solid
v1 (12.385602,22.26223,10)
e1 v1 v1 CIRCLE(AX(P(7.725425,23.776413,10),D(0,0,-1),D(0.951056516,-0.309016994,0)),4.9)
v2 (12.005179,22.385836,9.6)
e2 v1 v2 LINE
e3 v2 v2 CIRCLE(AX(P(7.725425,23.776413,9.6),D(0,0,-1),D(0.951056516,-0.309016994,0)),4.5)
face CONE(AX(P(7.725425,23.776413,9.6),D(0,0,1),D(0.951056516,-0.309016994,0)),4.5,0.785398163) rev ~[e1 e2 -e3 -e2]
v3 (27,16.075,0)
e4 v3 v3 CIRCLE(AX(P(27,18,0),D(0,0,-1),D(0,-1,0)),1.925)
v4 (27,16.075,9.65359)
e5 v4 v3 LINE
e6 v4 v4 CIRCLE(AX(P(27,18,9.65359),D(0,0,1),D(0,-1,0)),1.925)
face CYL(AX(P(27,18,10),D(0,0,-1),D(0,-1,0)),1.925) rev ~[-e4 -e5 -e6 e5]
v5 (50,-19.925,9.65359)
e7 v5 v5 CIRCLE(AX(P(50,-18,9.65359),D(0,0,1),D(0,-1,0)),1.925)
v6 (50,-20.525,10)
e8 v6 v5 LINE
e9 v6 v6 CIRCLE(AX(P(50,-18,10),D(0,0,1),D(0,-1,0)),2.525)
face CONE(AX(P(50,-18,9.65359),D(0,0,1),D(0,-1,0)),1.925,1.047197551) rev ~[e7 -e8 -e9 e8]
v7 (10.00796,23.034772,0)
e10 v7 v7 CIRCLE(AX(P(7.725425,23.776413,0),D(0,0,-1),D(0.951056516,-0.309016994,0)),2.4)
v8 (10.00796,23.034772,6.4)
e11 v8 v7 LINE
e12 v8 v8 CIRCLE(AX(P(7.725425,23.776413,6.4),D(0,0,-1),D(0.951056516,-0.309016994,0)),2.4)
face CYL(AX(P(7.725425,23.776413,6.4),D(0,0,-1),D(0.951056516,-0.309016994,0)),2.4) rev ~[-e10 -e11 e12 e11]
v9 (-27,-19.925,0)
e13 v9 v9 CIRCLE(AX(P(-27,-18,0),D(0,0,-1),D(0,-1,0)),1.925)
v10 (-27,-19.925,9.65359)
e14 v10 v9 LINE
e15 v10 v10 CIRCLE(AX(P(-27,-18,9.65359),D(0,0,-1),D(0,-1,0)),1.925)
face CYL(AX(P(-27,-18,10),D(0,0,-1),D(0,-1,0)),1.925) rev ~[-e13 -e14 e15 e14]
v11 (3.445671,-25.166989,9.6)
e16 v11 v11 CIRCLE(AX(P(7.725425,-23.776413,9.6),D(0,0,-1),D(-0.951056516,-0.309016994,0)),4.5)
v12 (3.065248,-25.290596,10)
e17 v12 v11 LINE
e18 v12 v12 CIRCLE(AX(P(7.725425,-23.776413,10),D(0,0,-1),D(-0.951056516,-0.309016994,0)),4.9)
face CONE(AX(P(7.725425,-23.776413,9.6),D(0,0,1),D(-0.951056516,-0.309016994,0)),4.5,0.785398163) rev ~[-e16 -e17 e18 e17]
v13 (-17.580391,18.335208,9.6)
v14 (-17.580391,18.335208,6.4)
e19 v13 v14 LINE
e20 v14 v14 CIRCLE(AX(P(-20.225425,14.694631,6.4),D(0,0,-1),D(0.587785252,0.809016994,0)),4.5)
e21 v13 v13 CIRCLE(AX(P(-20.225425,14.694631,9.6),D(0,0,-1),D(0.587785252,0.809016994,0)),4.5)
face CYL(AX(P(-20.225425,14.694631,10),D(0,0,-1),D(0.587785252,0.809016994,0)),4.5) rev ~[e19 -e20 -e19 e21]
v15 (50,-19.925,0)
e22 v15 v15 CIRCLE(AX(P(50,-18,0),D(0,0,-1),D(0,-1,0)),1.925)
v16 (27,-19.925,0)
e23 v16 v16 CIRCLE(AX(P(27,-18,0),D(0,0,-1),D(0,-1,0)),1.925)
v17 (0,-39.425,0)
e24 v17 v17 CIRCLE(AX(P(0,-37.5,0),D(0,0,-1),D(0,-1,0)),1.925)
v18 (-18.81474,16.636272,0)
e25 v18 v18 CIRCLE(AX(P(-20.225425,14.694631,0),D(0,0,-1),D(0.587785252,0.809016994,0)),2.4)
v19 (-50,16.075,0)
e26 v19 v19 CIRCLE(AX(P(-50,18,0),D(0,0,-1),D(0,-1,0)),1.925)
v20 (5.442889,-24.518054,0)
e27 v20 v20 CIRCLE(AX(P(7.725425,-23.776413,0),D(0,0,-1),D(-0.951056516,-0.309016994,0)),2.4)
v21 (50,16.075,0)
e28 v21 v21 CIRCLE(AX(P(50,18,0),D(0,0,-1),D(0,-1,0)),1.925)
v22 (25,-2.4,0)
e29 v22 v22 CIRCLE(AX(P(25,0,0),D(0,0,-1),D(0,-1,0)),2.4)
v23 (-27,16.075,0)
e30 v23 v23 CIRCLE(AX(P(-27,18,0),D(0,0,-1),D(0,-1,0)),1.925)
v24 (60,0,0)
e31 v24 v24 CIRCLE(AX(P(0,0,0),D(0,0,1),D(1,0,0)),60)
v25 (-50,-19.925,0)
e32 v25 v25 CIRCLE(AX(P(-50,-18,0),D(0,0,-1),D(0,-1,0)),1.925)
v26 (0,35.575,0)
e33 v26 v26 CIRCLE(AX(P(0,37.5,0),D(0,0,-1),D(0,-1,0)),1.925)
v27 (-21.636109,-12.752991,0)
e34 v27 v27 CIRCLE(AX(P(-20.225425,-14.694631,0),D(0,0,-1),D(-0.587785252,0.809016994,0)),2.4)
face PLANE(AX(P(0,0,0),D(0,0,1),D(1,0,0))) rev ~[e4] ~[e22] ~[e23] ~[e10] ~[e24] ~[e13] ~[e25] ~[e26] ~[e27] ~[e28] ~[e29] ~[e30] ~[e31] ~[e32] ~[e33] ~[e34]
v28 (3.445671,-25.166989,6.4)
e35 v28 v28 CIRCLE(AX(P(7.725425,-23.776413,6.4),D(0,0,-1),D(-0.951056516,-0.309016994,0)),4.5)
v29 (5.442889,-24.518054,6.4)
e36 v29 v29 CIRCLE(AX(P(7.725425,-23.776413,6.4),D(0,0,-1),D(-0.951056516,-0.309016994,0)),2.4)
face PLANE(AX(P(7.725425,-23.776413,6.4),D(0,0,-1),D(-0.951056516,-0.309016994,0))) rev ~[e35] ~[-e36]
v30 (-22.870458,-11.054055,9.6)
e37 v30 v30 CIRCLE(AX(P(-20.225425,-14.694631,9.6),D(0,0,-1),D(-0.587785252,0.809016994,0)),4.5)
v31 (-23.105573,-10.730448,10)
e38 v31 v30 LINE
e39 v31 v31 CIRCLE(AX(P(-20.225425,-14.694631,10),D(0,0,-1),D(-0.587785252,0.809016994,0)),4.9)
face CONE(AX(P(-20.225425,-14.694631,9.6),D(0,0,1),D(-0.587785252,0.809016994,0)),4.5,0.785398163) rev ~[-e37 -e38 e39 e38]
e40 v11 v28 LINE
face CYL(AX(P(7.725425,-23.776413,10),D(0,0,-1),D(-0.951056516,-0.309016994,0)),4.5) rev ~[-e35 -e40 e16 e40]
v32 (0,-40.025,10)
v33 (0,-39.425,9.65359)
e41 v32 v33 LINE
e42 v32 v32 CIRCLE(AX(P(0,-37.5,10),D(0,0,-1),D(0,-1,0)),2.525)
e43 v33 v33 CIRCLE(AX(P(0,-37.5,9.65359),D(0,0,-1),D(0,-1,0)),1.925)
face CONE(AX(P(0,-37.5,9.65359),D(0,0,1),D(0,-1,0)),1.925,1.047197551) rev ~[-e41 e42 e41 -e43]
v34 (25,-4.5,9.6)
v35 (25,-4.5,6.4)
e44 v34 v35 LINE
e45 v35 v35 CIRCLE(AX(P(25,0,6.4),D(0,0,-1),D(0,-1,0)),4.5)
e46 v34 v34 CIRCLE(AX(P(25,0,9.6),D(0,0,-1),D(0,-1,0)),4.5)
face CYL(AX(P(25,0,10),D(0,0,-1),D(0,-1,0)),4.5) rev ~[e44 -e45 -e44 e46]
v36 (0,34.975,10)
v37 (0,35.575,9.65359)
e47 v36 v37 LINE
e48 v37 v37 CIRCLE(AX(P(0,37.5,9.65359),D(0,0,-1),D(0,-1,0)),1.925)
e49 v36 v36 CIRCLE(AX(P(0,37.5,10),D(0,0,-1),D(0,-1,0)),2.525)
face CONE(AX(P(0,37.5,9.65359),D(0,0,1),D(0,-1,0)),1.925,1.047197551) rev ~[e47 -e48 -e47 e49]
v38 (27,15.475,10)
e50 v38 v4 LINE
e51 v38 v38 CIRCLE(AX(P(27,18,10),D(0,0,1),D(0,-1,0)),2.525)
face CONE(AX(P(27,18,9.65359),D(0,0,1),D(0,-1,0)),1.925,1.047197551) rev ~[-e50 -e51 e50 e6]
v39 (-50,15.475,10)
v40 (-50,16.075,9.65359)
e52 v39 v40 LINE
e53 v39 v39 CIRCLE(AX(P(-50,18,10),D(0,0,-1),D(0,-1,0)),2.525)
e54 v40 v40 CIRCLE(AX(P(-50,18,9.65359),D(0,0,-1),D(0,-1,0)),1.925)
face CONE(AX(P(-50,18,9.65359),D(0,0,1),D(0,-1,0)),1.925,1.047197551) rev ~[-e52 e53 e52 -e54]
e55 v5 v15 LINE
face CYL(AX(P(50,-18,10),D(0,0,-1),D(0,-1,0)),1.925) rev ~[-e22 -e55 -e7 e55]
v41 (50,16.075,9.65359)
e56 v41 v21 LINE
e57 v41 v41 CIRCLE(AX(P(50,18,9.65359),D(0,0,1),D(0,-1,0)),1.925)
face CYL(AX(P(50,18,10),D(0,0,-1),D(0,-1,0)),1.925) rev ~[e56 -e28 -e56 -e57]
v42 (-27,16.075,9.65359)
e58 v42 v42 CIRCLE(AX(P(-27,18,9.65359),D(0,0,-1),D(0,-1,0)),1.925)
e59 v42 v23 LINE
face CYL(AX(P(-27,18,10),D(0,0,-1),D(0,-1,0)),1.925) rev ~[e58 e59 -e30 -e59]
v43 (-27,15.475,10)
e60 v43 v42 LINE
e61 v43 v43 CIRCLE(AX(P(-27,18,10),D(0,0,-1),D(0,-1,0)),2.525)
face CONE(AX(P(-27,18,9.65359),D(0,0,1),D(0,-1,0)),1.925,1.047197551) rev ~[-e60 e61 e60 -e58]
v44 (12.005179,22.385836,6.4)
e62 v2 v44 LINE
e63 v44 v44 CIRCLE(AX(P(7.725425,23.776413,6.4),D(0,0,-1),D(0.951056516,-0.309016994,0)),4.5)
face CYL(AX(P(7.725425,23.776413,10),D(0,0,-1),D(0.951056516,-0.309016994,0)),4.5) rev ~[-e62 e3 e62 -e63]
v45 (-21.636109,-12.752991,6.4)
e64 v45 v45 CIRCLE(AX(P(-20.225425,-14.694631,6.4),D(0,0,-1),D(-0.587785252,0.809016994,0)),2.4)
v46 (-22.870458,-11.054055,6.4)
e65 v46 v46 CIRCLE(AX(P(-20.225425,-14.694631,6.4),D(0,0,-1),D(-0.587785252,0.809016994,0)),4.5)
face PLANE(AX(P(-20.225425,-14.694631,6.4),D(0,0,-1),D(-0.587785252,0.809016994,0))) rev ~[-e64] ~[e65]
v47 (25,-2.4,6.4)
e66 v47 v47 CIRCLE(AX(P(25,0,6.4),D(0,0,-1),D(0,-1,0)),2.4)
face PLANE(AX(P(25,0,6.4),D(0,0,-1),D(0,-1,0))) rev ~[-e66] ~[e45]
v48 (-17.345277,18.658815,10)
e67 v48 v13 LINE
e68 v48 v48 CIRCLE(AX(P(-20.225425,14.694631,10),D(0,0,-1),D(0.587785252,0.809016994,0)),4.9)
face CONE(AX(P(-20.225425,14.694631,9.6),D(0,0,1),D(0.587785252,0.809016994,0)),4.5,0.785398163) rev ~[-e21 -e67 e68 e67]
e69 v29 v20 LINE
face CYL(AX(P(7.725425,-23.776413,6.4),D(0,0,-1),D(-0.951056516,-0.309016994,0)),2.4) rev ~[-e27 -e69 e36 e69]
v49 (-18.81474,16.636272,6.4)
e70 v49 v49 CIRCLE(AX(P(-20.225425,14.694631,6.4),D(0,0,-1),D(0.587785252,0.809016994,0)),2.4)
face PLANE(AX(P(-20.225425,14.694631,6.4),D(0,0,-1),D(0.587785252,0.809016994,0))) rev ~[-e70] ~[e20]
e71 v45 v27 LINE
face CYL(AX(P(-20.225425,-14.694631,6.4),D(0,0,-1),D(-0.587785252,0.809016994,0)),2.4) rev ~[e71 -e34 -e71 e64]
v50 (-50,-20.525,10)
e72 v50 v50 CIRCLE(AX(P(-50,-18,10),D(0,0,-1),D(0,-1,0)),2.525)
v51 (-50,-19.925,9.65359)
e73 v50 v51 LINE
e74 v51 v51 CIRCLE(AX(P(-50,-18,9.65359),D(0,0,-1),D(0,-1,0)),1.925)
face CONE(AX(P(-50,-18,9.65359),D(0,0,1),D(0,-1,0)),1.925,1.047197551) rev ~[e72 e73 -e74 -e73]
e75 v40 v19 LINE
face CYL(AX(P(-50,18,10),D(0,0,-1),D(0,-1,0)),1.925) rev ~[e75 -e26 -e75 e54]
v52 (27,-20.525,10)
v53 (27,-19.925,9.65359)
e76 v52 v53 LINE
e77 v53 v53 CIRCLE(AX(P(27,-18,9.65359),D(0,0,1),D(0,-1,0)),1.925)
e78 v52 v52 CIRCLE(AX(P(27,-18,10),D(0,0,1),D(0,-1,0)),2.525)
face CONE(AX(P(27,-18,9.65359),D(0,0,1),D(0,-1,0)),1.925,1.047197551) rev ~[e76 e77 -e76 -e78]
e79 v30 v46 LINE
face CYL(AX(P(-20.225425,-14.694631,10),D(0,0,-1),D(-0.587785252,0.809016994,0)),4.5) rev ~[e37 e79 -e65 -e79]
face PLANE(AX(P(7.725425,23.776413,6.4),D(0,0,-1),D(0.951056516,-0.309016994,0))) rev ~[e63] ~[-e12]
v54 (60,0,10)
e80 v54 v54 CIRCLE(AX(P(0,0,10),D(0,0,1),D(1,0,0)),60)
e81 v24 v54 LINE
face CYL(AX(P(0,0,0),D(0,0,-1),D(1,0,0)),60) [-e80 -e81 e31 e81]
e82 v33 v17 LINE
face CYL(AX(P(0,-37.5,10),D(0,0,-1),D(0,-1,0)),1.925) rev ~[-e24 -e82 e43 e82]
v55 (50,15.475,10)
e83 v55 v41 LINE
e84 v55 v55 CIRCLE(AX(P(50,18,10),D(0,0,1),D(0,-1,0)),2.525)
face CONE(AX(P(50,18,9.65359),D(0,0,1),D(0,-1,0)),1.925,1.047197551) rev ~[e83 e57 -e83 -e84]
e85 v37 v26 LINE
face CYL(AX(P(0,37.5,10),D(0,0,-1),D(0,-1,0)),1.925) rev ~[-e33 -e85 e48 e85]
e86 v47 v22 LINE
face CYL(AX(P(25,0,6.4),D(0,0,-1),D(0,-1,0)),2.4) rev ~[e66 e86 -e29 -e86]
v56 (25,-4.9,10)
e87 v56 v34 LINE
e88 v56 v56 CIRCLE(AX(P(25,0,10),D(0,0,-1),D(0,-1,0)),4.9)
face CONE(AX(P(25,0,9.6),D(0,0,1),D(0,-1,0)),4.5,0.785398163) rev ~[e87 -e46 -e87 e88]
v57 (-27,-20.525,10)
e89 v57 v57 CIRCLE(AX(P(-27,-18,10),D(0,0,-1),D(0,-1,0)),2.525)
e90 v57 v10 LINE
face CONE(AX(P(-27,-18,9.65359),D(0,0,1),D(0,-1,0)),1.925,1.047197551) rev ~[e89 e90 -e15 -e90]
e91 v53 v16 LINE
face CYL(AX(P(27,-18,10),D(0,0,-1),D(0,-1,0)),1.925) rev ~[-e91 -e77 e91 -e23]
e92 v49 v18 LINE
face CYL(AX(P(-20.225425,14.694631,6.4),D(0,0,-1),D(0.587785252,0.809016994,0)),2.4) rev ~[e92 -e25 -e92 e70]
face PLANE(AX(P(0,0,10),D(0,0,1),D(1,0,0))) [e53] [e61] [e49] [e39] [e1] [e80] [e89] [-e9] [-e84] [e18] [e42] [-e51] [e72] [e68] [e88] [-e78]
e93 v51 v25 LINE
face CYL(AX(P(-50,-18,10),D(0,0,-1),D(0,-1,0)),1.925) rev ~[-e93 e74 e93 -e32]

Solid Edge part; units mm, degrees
sketch "Sketch1" plane through (0, 0, 0) normal (0, 0, 1) x (1, 0, 0)
  circle A0 centre (0, 0) radius 60
  dimension "D1" = 120
extrude "Protrusion1" add sketch "Sketch1" along normal blind 10
hole "Hole_1" at (25, 0, 10) direction (0, 0, -1) diameter 4.8 depth 30 tip angle 118 counterbore diameter 9 counterbore depth 3.6 start chamfer 0.4 start chamfer angle 45
pattern_circular "Pattern1" count 5 over 360 about axis through (0, 0, 10) along (0, 0, -1) of "Hole_1"
hole "Hole_2" at (-27, -18, 10) direction (0, 0, -1) diameter 3.85 depth 30 tip angle 118 start chamfer 0.6 start chamfer angle 60
hole "Hole1" at (-27, 18, 10) direction (0, 0, -1) diameter 3.85 depth 30 tip angle 118 start chamfer 0.6 start chamfer angle 60
hole "Hole2" at (-50, -18, 10) direction (0, 0, -1) diameter 3.85 depth 30 tip angle 118 start chamfer 0.6 start chamfer angle 60
hole "Hole3" at (-50, 18, 10) direction (0, 0, -1) diameter 3.85 depth 30 tip angle 118 start chamfer 0.6 start chamfer angle 60
mirror "Mirror1" about plane through (0, 0, 0) normal (1, 0, 0) of "Hole_2", "Hole1", "Hole2", "Hole3"
hole "Hole_10" at (0, 37.5, 10) direction (0, 0, -1) diameter 3.85 depth 30 tip angle 118 start chamfer 0.6 start chamfer angle 60
hole "Hole8" at (0, -37.5, 10) direction (0, 0, -1) diameter 3.85 depth 30 tip angle 118 start chamfer 0.6 start chamfer angle 60
properties material "Polyethylene, low density"
